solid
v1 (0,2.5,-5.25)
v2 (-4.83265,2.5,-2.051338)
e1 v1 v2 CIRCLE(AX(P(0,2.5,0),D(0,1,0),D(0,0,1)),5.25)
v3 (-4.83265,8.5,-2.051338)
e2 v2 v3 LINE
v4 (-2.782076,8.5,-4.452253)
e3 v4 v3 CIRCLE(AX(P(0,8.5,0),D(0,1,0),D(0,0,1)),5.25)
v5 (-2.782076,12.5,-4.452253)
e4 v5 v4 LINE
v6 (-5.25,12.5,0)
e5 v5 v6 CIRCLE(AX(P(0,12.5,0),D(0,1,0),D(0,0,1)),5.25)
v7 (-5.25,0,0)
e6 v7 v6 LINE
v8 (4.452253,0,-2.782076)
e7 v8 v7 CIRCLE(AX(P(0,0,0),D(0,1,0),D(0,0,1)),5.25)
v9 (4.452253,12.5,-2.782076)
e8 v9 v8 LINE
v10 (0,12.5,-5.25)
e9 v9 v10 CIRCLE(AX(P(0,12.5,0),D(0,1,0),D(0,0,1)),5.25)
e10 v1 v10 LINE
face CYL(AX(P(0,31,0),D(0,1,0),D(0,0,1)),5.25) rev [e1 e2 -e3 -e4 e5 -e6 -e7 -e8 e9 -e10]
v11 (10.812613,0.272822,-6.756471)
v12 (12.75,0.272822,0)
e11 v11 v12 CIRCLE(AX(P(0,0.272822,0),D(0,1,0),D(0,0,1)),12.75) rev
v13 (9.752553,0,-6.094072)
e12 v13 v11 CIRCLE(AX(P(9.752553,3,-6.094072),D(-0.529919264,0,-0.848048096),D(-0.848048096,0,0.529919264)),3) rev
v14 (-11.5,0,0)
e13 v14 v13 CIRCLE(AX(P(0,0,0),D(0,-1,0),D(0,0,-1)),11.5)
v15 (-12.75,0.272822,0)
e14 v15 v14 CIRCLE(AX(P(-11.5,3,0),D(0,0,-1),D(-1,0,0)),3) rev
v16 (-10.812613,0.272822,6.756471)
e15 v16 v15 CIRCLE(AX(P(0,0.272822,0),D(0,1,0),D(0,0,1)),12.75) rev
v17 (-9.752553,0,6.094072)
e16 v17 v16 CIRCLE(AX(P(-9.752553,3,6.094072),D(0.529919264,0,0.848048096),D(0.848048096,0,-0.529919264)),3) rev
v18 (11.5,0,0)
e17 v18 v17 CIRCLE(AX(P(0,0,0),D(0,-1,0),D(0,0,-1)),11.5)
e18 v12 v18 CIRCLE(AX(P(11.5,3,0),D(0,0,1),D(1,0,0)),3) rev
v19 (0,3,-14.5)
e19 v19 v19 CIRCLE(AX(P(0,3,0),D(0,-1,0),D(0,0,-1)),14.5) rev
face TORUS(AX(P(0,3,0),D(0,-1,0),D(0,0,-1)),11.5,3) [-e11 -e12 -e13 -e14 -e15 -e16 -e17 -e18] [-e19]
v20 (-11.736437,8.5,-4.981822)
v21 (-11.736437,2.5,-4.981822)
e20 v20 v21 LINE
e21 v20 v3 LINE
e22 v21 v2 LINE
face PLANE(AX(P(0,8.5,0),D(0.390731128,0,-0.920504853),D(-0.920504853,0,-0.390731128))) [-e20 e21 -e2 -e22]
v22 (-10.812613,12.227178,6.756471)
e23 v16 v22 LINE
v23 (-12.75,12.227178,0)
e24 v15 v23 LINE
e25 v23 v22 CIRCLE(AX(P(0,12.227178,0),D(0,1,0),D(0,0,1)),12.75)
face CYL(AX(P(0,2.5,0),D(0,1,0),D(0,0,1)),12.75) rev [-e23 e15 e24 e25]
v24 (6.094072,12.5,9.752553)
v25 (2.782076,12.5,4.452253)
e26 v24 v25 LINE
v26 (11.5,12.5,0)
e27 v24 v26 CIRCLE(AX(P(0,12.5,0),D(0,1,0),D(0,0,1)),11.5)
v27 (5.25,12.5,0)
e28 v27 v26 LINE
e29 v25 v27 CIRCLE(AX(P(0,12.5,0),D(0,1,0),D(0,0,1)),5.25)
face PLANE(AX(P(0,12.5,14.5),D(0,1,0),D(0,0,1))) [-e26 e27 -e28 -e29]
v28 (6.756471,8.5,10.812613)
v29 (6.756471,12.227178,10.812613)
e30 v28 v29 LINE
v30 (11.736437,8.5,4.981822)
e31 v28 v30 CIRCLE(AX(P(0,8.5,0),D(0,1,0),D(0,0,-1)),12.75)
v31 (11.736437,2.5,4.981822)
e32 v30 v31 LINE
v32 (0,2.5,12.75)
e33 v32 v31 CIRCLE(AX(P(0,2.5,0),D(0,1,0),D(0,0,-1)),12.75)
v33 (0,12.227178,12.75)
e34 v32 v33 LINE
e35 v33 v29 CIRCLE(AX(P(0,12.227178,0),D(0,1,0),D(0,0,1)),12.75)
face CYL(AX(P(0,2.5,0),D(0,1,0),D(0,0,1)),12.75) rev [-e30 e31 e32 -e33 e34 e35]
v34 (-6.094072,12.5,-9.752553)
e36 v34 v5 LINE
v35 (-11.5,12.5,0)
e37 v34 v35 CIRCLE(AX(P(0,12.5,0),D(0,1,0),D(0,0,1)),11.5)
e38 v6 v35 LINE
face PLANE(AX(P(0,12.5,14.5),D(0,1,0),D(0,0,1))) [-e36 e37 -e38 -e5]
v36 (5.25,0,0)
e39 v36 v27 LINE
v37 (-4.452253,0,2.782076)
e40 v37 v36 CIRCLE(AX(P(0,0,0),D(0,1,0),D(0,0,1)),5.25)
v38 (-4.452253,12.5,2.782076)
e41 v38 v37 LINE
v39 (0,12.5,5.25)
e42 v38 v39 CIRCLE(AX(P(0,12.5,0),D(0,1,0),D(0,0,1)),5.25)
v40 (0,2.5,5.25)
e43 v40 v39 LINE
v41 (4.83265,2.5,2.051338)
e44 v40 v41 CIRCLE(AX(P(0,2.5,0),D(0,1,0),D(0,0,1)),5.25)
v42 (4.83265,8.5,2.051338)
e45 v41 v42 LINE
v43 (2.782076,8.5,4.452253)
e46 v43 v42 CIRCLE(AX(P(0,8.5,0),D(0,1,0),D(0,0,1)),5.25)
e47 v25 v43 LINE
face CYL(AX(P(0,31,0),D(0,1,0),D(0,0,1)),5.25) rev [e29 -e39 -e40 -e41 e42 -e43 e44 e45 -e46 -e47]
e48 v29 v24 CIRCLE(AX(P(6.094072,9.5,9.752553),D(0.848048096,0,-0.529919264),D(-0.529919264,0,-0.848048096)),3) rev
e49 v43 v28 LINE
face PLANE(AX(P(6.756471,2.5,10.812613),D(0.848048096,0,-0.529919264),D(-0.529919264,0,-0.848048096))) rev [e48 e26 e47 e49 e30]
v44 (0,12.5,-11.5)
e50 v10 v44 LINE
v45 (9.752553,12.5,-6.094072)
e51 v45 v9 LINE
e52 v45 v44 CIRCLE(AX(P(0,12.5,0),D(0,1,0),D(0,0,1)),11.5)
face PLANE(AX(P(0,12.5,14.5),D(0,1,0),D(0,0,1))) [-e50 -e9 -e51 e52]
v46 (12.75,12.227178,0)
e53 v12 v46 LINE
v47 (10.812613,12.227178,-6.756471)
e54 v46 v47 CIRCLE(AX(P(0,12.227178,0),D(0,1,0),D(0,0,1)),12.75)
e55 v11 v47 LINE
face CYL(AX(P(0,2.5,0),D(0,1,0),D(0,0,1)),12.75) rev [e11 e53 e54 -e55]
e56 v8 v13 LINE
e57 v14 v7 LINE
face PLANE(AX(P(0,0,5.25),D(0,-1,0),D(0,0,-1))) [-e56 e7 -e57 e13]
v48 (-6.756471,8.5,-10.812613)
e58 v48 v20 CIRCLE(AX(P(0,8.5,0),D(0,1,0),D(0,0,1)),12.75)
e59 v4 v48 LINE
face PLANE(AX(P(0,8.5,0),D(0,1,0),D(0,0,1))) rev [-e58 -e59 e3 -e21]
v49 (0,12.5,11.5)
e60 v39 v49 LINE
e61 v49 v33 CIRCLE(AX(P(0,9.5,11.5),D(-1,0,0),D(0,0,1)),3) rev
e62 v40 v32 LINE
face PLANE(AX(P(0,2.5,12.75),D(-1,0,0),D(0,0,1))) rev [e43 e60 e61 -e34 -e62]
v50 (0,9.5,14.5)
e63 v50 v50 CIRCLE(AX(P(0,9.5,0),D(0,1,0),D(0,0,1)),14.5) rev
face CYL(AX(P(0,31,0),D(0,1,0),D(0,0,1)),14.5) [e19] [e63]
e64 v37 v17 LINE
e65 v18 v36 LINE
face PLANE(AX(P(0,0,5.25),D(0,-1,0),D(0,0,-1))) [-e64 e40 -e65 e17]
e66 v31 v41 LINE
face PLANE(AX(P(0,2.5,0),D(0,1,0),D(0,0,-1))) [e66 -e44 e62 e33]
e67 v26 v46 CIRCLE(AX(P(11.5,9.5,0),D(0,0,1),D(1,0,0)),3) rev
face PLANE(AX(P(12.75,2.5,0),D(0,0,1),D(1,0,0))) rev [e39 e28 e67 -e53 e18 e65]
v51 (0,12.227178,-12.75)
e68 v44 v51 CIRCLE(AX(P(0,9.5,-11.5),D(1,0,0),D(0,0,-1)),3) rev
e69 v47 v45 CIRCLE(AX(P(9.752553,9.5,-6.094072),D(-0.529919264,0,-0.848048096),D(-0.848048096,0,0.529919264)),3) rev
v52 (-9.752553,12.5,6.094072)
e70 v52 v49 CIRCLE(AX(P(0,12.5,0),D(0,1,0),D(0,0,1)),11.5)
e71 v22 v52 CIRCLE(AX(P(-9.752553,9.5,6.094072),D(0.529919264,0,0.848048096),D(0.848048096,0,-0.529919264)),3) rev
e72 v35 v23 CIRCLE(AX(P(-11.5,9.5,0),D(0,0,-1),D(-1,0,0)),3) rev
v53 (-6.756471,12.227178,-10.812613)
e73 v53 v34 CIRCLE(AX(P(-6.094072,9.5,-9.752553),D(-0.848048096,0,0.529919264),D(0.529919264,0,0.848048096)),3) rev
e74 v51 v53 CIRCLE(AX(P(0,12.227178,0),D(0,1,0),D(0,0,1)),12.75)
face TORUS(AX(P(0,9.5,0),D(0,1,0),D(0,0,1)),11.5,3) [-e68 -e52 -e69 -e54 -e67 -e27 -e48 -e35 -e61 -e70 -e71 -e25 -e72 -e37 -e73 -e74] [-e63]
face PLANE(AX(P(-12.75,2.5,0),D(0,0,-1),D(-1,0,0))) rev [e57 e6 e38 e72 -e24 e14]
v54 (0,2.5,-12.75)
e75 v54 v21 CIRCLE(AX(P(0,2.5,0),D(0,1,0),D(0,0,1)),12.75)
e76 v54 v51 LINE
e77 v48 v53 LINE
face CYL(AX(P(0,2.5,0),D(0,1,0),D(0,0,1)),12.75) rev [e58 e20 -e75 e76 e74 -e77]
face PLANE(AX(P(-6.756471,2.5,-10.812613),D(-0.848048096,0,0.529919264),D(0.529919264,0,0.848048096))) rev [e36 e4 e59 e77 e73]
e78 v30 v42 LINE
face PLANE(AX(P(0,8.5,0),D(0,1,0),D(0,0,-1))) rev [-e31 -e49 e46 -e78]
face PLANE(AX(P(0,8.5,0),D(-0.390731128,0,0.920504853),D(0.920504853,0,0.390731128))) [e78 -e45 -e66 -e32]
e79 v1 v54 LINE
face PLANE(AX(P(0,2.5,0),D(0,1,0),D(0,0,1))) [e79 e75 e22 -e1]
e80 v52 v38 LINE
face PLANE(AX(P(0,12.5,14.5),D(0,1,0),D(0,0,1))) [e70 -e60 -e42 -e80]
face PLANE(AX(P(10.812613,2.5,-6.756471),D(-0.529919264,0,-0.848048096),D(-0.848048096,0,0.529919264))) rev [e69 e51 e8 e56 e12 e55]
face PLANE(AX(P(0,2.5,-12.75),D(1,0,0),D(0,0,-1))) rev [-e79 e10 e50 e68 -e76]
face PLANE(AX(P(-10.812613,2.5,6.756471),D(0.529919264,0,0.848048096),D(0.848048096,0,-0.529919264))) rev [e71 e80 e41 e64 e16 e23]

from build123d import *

# Parameters (mm, degrees)
SKETCH2_W          = 9.25
SKETCH2_H          = 12.5
CUT_EXTRUDE1_DEPTH = 10
CIRPATTERN1_COUNT  = 4
CUT_EXTRUDE2_DEPTH = 10
CUT_EXTRUDE3_START = 6
CUT_EXTRUDE3_DEPTH = 6
CIRPATTERN2_COUNT  = 2
FILLET1_R          = 3


with BuildPart() as part:
    # Sketch2 → Revolve1 (revolve)
    with BuildSketch(Plane(origin=(0, 0, 0), x_dir=(0, 0, -1), z_dir=(1, 0, 0))):
        with Locations((-9.875, 6.25)):
            Rectangle(SKETCH2_W, SKETCH2_H)
    revolve(axis=Axis((0, 31, 0), (0, -1, 0)))

    # Sketch3 → Cut-Extrude1 (cut)
    with BuildSketch(Plane(origin=(0, 12.5, 0), x_dir=(1, 0, 0), z_dir=(0, 1, 0))):
        with BuildLine():
            Line((-6.756470619, 10.812613226), (0, 0))
            Line((0, 0), (0, 12.75))
            ThreePointArc((0, 12.75), (-3.514376287, 12.256086623), (-6.756470619, 10.812613226))
        make_face()
    cut_extrude1 = extrude(amount=-CUT_EXTRUDE1_DEPTH, mode=Mode.SUBTRACT)

    # CirPattern1: Cut-Extrude1 ×4 about axis
    cirpattern1_axis = Axis((0, 12.5, 0), (0, 1, 0))
    for i in range(1, CIRPATTERN1_COUNT):
        add(cut_extrude1.rotate(cirpattern1_axis, i * 360 / CIRPATTERN1_COUNT), mode=Mode.SUBTRACT)

    # Sketch4 → Cut-Extrude2 (cut)
    with BuildSketch(Plane(origin=(0, 2.5, 0), x_dir=(1, 0, 0), z_dir=(0, 1, 0))):
        with BuildLine():
            Line((5.25, 0), (12.75, 0))
            ThreePointArc((12.75, 0), (12.256086623, 3.514376287), (10.812613226, 6.756470619))
            Line((10.812613226, 6.756470619), (4.452252505, 2.782076137))
            ThreePointArc((4.452252505, 2.782076137), (5.046623904, 1.447096118), (5.25, 0))
        make_face()
        with BuildLine():
            Line((-5.25, 0), (-12.75, 0))
            ThreePointArc((-12.75, 0), (-12.256086623, -3.514376287), (-10.812613226, -6.756470619))
            Line((-10.812613226, -6.756470619), (-4.452252505, -2.782076137))
            ThreePointArc((-4.452252505, -2.782076137), (-5.046623904, -1.447096118), (-5.25, 0))
        make_face()
    extrude(amount=-CUT_EXTRUDE2_DEPTH, mode=Mode.SUBTRACT)

    # Sketch5 → Cut-Extrude3 (cut)
    with BuildSketch(Plane(origin=(0, 2.5, 0), x_dir=(1, 0, 0), z_dir=(0, 1, 0)).offset(CUT_EXTRUDE3_START)):
        with BuildLine():
            Line((0, 0), (-6.756470619, 10.812613226))
            ThreePointArc((-6.756470619, 10.812613226), (-9.695176061, 8.280462616), (-11.736436882, 4.981821888))
            Line((-11.736436882, 4.981821888), (0, 0))
        make_face()
    cut_extrude3 = extrude(amount=-CUT_EXTRUDE3_DEPTH, mode=Mode.SUBTRACT)

    # CirPattern2: Cut-Extrude3 ×2 about axis
    cirpattern2_axis = Axis((0, 12.5, 0), (0, 1, 0))
    for i in range(1, CIRPATTERN2_COUNT):
        add(cut_extrude3.rotate(cirpattern2_axis, i * 360 / CIRPATTERN2_COUNT), mode=Mode.SUBTRACT)

    # Fillet1
    # the kernel refuses this fillet: 3 mm, written as the material it takes off along each edge
    with BuildSketch(Plane(origin=(0, 12.5, 0), x_dir=(0, 0, 1), z_dir=(1, 0, 0))) as fillet1_piece_1:
        with BuildLine():
            CenterArc((14.5 - FILLET1_R, FILLET1_R), FILLET1_R, 270, 90)
            Line((14.5, FILLET1_R), (14.5, 0))
            Line((14.5, 0), (14.5 - FILLET1_R, 0))
        make_face()
    revolve(axis=Axis((0, 12.5, 0), (0, -1, 0)), mode=Mode.SUBTRACT)
    with BuildSketch(Plane(origin=(0, 0, 0), x_dir=(0, 0, 1), z_dir=(1, 0, 0))) as fillet1_piece_2:
        with BuildLine():
            CenterArc((14.5 - FILLET1_R, -FILLET1_R), FILLET1_R, 360, 90)
            Line((14.5, -FILLET1_R), (14.5, 0))
            Line((14.5, 0), (14.5 - FILLET1_R, 0))
        make_face()
    revolve(axis=Axis((0, 0, 0), (0, -1, 0)), mode=Mode.SUBTRACT)


solid = part.part
